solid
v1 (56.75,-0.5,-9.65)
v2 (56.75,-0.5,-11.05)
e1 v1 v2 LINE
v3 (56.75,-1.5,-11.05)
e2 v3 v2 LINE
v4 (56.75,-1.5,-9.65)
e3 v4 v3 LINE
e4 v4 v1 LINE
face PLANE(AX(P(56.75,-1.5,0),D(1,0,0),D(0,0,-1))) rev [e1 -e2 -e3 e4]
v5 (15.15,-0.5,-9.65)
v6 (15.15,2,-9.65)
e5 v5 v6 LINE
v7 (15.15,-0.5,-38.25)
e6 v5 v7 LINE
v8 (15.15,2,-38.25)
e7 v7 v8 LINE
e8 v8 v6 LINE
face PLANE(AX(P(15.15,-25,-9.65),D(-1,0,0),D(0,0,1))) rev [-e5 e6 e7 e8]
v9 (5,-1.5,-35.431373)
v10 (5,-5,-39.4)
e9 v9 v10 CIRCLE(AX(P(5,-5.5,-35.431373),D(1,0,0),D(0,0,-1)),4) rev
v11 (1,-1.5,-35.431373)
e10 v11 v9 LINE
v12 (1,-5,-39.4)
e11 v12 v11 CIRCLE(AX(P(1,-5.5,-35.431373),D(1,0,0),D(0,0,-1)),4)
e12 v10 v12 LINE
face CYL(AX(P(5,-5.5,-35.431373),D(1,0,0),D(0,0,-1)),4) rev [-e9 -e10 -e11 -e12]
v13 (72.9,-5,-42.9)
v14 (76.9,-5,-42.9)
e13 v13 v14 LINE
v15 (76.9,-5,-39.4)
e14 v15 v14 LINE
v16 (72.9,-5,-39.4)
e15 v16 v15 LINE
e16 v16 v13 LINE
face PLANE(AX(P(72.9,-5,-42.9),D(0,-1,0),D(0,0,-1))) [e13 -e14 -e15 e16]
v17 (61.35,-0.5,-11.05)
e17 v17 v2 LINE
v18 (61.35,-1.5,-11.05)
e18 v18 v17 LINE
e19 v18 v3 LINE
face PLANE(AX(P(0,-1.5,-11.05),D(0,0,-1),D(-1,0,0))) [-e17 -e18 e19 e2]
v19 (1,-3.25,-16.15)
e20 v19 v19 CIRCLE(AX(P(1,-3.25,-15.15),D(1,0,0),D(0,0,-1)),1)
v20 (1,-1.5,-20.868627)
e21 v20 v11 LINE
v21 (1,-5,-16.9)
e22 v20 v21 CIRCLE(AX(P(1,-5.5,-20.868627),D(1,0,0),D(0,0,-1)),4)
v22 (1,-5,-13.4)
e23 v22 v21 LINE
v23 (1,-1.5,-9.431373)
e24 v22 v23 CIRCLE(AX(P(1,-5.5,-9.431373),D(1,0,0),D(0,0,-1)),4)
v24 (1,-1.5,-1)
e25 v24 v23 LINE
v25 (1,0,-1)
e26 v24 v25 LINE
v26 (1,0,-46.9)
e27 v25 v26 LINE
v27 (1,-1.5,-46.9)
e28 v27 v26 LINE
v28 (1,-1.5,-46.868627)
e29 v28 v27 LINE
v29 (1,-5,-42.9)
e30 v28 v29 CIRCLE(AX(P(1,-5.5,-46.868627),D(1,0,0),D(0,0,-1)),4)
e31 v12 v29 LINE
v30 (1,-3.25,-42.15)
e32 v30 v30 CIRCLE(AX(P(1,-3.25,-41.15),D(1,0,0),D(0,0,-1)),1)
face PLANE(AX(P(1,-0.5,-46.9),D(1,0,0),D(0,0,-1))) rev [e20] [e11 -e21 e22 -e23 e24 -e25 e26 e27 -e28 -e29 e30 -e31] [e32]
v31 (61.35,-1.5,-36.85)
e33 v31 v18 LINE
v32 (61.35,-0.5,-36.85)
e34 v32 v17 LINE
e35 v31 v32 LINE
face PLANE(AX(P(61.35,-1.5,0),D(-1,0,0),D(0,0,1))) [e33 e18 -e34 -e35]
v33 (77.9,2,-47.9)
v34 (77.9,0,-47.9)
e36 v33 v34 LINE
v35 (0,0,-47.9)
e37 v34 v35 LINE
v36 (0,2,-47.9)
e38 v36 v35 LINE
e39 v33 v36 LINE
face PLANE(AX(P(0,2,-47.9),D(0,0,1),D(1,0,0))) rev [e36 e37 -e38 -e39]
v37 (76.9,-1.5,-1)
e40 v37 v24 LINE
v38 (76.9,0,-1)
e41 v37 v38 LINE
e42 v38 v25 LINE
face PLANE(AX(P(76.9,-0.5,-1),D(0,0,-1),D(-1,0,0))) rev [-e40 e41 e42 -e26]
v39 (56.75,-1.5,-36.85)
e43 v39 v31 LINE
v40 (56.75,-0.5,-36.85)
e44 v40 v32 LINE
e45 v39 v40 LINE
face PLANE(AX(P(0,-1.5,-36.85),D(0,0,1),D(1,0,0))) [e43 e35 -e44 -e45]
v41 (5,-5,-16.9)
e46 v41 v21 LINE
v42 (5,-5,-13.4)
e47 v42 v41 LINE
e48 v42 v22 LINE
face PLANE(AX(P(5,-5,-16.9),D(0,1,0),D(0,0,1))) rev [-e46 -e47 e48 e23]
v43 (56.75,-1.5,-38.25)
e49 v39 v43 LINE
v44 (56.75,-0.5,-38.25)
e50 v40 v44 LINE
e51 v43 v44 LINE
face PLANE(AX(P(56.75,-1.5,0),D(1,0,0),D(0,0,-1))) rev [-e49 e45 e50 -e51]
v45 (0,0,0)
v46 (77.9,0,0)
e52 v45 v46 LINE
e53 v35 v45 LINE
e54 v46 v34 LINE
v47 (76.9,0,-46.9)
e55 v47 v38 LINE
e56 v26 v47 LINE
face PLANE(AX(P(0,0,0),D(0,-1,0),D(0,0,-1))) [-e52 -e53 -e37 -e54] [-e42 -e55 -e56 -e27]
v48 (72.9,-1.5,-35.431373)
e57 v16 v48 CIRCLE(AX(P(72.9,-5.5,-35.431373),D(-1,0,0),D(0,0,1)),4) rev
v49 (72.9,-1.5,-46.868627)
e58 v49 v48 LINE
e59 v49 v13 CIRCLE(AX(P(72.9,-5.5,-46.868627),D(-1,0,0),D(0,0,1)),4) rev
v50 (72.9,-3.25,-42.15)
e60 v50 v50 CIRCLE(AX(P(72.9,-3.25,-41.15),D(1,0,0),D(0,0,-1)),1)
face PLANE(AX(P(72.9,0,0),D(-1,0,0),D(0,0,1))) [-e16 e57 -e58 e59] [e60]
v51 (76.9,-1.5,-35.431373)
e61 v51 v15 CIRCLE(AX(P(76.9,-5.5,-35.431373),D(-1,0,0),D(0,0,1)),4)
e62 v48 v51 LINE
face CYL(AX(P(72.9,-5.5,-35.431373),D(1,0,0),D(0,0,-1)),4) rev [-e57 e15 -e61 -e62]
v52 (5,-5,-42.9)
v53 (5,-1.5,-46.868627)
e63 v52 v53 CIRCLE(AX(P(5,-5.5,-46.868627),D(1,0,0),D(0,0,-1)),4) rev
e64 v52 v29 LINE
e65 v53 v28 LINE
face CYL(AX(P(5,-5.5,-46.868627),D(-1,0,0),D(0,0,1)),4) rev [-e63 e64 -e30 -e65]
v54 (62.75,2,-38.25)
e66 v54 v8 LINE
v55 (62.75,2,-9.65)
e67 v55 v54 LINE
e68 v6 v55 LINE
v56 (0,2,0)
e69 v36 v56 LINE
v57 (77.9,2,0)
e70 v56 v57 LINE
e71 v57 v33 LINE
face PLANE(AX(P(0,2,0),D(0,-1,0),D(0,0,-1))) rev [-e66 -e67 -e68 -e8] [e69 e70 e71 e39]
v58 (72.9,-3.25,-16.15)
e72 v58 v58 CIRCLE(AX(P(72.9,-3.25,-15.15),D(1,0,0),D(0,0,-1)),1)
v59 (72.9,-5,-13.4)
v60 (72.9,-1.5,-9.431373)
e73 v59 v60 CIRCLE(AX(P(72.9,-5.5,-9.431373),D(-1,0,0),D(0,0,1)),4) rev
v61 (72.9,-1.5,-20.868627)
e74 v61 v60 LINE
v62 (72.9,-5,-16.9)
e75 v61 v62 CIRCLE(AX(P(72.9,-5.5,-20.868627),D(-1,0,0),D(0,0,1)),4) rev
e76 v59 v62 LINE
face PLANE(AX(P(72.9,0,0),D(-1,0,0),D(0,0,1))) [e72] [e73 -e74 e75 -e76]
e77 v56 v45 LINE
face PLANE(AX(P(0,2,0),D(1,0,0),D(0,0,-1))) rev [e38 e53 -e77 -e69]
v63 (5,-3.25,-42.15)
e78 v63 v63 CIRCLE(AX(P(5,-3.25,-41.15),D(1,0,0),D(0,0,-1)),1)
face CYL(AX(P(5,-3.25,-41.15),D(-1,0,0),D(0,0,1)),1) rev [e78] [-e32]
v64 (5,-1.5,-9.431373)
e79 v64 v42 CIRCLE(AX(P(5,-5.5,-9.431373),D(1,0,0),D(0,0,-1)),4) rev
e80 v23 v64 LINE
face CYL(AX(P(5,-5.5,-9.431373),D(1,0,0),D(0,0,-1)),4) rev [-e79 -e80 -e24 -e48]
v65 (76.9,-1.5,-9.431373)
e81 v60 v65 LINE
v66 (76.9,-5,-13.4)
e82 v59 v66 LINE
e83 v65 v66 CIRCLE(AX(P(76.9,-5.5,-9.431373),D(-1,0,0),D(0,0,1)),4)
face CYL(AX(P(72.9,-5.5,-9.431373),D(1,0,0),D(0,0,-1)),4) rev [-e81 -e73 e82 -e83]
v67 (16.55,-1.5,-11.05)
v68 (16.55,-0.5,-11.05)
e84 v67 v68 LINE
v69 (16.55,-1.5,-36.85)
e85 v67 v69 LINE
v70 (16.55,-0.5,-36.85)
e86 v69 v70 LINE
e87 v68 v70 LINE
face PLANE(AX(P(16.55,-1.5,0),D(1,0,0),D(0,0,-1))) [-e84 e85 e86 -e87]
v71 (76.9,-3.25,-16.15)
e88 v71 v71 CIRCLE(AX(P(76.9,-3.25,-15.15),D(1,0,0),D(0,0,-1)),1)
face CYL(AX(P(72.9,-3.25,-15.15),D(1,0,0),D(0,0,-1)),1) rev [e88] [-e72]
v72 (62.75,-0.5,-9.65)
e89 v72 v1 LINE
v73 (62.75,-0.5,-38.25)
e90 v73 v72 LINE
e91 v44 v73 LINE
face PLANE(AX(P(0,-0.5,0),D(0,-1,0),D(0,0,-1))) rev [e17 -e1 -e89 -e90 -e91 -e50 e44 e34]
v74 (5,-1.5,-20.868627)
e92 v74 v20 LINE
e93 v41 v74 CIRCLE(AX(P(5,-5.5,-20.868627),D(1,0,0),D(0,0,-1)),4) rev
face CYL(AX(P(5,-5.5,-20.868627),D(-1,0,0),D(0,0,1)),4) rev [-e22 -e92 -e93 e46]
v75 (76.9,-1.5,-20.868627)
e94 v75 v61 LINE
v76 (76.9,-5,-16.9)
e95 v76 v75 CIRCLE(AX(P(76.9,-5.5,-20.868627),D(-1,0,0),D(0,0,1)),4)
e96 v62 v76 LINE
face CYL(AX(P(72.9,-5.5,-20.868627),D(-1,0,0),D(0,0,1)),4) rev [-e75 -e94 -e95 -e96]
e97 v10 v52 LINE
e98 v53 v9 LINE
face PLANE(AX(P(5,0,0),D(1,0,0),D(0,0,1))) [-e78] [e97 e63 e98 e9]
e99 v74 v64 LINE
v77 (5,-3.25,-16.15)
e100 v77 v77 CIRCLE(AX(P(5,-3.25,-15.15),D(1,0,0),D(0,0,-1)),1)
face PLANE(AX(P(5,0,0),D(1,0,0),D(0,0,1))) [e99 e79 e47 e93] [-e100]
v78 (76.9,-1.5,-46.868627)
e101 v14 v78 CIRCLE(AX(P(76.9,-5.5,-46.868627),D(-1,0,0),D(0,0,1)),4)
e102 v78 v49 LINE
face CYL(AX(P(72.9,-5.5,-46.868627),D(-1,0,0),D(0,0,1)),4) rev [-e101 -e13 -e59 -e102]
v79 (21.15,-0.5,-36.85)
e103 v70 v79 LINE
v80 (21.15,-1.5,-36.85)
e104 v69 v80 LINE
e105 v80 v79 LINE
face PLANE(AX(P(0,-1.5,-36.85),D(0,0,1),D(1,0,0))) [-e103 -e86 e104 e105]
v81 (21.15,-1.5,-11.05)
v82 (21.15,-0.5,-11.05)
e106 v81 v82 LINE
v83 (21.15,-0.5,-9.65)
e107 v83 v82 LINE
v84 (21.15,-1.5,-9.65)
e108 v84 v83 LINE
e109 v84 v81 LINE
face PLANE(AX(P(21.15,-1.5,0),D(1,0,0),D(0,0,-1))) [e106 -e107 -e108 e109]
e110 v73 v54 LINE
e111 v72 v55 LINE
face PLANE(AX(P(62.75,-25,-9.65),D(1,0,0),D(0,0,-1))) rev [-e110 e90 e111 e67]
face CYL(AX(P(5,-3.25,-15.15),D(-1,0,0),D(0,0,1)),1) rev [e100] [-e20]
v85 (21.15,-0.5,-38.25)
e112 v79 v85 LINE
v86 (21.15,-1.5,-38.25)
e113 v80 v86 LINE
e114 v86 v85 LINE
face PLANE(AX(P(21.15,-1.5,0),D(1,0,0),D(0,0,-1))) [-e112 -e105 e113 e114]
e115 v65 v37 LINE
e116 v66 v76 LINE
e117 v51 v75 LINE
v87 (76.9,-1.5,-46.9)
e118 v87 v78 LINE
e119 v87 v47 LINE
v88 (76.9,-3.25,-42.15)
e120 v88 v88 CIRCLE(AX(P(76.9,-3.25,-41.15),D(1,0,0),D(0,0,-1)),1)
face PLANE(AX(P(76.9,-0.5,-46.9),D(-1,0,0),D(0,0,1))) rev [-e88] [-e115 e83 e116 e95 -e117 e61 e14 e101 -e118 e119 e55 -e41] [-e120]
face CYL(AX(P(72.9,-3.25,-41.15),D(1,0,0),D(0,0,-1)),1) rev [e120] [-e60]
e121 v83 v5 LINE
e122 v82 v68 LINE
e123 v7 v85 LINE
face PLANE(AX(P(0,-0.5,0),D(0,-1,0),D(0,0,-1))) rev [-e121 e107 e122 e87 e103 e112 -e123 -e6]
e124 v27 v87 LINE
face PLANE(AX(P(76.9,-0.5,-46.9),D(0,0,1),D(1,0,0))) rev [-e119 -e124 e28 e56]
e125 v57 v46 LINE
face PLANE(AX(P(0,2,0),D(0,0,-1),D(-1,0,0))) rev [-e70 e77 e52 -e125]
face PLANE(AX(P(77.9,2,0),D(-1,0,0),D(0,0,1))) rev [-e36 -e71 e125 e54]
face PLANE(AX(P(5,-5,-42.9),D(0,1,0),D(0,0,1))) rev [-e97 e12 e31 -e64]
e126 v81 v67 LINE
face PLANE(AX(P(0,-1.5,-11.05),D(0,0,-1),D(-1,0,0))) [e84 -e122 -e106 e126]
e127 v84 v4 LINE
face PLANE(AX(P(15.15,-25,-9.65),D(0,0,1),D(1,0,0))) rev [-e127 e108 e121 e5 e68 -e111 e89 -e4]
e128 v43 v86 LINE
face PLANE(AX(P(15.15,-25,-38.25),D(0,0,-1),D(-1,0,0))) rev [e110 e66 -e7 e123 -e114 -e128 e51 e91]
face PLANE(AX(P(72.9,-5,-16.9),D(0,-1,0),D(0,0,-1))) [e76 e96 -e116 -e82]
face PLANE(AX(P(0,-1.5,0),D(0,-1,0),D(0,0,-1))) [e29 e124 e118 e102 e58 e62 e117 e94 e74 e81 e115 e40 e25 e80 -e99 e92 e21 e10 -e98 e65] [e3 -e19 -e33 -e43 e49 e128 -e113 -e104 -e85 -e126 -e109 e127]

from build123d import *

# Parameters (mm, degrees)
SKETCH_1_W             = 77.9
SKETCH_1_H             = 47.9
EXTRUDE_1_DEPTH        = 2
SKETCH_2_W             = 47.6
SKETCH_2_H             = 28.6
CUT_EXTRUDE_1_DEPTH    = 27
SKETCH_4_W             = 75.9
SKETCH_4_H             = 45.9
SKETCH_4_W_2           = 47.6
SKETCH_4_H_2           = 28.6
EXTRUDE_3_DEPTH        = 0.5
SKETCH_5_W             = 75.9
SKETCH_5_H             = 45.9
SKETCH_5_W_2           = 47.6
SKETCH_5_H_2           = 28.6
EXTRUDE_4_DEPTH        = 1
SKETCH_8_W             = 3.5
SKETCH_8_H             = 3.5
SKETCH_8_R             = 1
EXTRUDE_5_DEPTH        = 4
FILLET_1_R             = 4
FILLET_1_OF_MIRROR_1_R = 4


with BuildPart() as part:
    # 草图1 → 凸台-拉伸1 (new body)
    with BuildSketch(Plane(origin=(0, 0, 0), x_dir=(1, 0, 0), z_dir=(0, 1, 0))):
        with Locations((38.95, 23.95)):
            Rectangle(SKETCH_1_W, SKETCH_1_H)
    extrude(amount=EXTRUDE_1_DEPTH)

    # 草图2 → 切除-拉伸1 (cut)
    with BuildSketch(Plane(origin=(0, 2, 0), x_dir=(1, 0, 0), z_dir=(0, 1, 0))):
        with Locations((38.95, 23.95)):
            Rectangle(SKETCH_2_W, SKETCH_2_H)
    extrude(amount=-CUT_EXTRUDE_1_DEPTH, mode=Mode.SUBTRACT)

    # 草图4 → 凸台-拉伸3 (add)
    with BuildSketch(Plane.XZ):
        with Locations((38.95, -23.95)):
            Rectangle(SKETCH_4_W, SKETCH_4_H)
        with Locations((38.95, -23.95)):
            Rectangle(SKETCH_4_W_2, SKETCH_4_H_2, mode=Mode.SUBTRACT)
    extrude(amount=EXTRUDE_3_DEPTH)

    # 草图5 → 凸台-拉伸4 (add)
    # profile 1 of 3: a face of its own
    with BuildSketch(Plane.XZ.offset(0.5)):
        with Locations((38.95, -23.95)):
            Rectangle(SKETCH_5_W, SKETCH_5_H)
        with Locations((38.95, -23.95)):
            Rectangle(SKETCH_5_W_2, SKETCH_5_H_2, mode=Mode.SUBTRACT)
    # profile 2 of 3: a face of its own
    with BuildSketch(Plane.XZ.offset(0.5)):
        Polygon((15.15, -38.25), (21.15, -38.25), (21.15, -36.85), (16.55, -36.85), (16.55, -11.05), (21.15, -11.05), (21.15, -9.65), (15.15, -9.65), align=None)
    # profile 3 of 3: a face of its own
    with BuildSketch(Plane.XZ.offset(0.5)):
        Polygon((61.35, -11.05), (61.35, -36.85), (56.75, -36.85), (56.75, -38.25), (62.75, -38.25), (62.75, -9.65), (56.75, -9.65), (56.75, -11.05), align=None)
    extrude(amount=EXTRUDE_4_DEPTH)

    # 草图8 → 凸台-拉伸5 (add)
    # profile 1 of 2: a face of its own
    with BuildSketch(Plane(origin=(76.9, 0, 0), x_dir=(0, 0, -1), z_dir=(1, 0, 0))):
        with Locations((41.15, -3.25)):
            Rectangle(SKETCH_8_W, SKETCH_8_H)
        with Locations((41.15, -3.25)):
            Circle(SKETCH_8_R, mode=Mode.SUBTRACT)
    # profile 2 of 2: a face of its own
    with BuildSketch(Plane(origin=(76.9, 0, 0), x_dir=(0, 0, -1), z_dir=(1, 0, 0))):
        with Locations((15.15, -3.25)):
            Rectangle(SKETCH_8_W, SKETCH_8_H)
        with Locations((15.15, -3.25)):
            Circle(SKETCH_8_R, mode=Mode.SUBTRACT)
    extrude_5 = extrude(amount=-EXTRUDE_5_DEPTH)

    # 圆角1
    # the kernel refuses this fillet: 4 mm, written as the material it adds along each edge
    with BuildSketch(Plane(origin=(76.9, -1.5, -42.9), x_dir=(0, 0, -1), z_dir=(-1, 0, 0)), Plane(origin=(76.9, -1.5, -16.9), x_dir=(0, 0, -1), z_dir=(-1, 0, 0))) as fillet_1_piece_1:
        with BuildLine():
            CenterArc((3.968626967, 4), FILLET_1_R, 187.180755781, 82.819244219)
            Line((0, 3.5), (-0.079372539, 3.49))
            ThreePointArc((-0.079372539, 3.49), (-0.08, 1.75), (-0.08, 0))
            Line((-0.08, 0), (0, -0.08))
            Line((0, -0.08), (3.968626967, -0.08))
            Line((3.968626967, -0.08), (3.968626967, 0))
        make_face()
    extrude(amount=4)
    with BuildSketch(Plane(origin=(76.9, -1.5, -13.4), x_dir=(0, 0, 1), z_dir=(-1, 0, 0)), Plane(origin=(76.9, -1.5, -39.4), x_dir=(0, 0, 1), z_dir=(-1, 0, 0))) as fillet_1_piece_2:
        with BuildLine():
            CenterArc((3.968626967, -4), FILLET_1_R, 90, 82.819244219)
            Line((0, -3.5), (-0.079372539, -3.49))
            ThreePointArc((-0.079372539, -3.49), (-0.08, -1.75), (-0.08, 0))
            Line((-0.08, 0), (0, 0.08))
            Line((0, 0.08), (3.968626967, 0.08))
            Line((3.968626967, 0.08), (3.968626967, 0))
        make_face()
    extrude(amount=4)

    # 镜向1: 凸台-拉伸5 across plane
    add(extrude_5.mirror(Plane(origin=(38.95, 0, 0), x_dir=(0, 0, 1), z_dir=(1, 0, 0))))

    # 圆角1 of 镜向1
    # the kernel refuses this fillet: 4 mm, written as the material it adds along each edge
    with BuildSketch(Plane(origin=(1, -1.5, -42.9), x_dir=(0, 0, -1), z_dir=(1, 0, 0)), Plane(origin=(1, -1.5, -16.9), x_dir=(0, 0, -1), z_dir=(1, 0, 0))) as fillet_1_of_mirror_1_piece_1:
        with BuildLine():
            CenterArc((3.968626967, -4), FILLET_1_OF_MIRROR_1_R, 90, 82.819244219)
            Line((0, -3.5), (-0.079372539, -3.49))
            ThreePointArc((-0.079372539, -3.49), (-0.08, -1.75), (-0.08, 0))
            Line((-0.08, 0), (0, 0.08))
            Line((0, 0.08), (3.968626967, 0.08))
            Line((3.968626967, 0.08), (3.968626967, 0))
        make_face()
    extrude(amount=4)
    with BuildSketch(Plane(origin=(1, -1.5, -13.4), x_dir=(0, 0, 1), z_dir=(1, 0, 0)), Plane(origin=(1, -1.5, -39.4), x_dir=(0, 0, 1), z_dir=(1, 0, 0))) as fillet_1_of_mirror_1_piece_2:
        with BuildLine():
            CenterArc((3.968626967, 4), FILLET_1_OF_MIRROR_1_R, 187.180755781, 82.819244219)
            Line((0, 3.5), (-0.079372539, 3.49))
            ThreePointArc((-0.079372539, 3.49), (-0.08, 1.75), (-0.08, 0))
            Line((-0.08, 0), (0, -0.08))
            Line((0, -0.08), (3.968626967, -0.08))
            Line((3.968626967, -0.08), (3.968626967, 0))
        make_face()
    extrude(amount=4)


solid = part.part
